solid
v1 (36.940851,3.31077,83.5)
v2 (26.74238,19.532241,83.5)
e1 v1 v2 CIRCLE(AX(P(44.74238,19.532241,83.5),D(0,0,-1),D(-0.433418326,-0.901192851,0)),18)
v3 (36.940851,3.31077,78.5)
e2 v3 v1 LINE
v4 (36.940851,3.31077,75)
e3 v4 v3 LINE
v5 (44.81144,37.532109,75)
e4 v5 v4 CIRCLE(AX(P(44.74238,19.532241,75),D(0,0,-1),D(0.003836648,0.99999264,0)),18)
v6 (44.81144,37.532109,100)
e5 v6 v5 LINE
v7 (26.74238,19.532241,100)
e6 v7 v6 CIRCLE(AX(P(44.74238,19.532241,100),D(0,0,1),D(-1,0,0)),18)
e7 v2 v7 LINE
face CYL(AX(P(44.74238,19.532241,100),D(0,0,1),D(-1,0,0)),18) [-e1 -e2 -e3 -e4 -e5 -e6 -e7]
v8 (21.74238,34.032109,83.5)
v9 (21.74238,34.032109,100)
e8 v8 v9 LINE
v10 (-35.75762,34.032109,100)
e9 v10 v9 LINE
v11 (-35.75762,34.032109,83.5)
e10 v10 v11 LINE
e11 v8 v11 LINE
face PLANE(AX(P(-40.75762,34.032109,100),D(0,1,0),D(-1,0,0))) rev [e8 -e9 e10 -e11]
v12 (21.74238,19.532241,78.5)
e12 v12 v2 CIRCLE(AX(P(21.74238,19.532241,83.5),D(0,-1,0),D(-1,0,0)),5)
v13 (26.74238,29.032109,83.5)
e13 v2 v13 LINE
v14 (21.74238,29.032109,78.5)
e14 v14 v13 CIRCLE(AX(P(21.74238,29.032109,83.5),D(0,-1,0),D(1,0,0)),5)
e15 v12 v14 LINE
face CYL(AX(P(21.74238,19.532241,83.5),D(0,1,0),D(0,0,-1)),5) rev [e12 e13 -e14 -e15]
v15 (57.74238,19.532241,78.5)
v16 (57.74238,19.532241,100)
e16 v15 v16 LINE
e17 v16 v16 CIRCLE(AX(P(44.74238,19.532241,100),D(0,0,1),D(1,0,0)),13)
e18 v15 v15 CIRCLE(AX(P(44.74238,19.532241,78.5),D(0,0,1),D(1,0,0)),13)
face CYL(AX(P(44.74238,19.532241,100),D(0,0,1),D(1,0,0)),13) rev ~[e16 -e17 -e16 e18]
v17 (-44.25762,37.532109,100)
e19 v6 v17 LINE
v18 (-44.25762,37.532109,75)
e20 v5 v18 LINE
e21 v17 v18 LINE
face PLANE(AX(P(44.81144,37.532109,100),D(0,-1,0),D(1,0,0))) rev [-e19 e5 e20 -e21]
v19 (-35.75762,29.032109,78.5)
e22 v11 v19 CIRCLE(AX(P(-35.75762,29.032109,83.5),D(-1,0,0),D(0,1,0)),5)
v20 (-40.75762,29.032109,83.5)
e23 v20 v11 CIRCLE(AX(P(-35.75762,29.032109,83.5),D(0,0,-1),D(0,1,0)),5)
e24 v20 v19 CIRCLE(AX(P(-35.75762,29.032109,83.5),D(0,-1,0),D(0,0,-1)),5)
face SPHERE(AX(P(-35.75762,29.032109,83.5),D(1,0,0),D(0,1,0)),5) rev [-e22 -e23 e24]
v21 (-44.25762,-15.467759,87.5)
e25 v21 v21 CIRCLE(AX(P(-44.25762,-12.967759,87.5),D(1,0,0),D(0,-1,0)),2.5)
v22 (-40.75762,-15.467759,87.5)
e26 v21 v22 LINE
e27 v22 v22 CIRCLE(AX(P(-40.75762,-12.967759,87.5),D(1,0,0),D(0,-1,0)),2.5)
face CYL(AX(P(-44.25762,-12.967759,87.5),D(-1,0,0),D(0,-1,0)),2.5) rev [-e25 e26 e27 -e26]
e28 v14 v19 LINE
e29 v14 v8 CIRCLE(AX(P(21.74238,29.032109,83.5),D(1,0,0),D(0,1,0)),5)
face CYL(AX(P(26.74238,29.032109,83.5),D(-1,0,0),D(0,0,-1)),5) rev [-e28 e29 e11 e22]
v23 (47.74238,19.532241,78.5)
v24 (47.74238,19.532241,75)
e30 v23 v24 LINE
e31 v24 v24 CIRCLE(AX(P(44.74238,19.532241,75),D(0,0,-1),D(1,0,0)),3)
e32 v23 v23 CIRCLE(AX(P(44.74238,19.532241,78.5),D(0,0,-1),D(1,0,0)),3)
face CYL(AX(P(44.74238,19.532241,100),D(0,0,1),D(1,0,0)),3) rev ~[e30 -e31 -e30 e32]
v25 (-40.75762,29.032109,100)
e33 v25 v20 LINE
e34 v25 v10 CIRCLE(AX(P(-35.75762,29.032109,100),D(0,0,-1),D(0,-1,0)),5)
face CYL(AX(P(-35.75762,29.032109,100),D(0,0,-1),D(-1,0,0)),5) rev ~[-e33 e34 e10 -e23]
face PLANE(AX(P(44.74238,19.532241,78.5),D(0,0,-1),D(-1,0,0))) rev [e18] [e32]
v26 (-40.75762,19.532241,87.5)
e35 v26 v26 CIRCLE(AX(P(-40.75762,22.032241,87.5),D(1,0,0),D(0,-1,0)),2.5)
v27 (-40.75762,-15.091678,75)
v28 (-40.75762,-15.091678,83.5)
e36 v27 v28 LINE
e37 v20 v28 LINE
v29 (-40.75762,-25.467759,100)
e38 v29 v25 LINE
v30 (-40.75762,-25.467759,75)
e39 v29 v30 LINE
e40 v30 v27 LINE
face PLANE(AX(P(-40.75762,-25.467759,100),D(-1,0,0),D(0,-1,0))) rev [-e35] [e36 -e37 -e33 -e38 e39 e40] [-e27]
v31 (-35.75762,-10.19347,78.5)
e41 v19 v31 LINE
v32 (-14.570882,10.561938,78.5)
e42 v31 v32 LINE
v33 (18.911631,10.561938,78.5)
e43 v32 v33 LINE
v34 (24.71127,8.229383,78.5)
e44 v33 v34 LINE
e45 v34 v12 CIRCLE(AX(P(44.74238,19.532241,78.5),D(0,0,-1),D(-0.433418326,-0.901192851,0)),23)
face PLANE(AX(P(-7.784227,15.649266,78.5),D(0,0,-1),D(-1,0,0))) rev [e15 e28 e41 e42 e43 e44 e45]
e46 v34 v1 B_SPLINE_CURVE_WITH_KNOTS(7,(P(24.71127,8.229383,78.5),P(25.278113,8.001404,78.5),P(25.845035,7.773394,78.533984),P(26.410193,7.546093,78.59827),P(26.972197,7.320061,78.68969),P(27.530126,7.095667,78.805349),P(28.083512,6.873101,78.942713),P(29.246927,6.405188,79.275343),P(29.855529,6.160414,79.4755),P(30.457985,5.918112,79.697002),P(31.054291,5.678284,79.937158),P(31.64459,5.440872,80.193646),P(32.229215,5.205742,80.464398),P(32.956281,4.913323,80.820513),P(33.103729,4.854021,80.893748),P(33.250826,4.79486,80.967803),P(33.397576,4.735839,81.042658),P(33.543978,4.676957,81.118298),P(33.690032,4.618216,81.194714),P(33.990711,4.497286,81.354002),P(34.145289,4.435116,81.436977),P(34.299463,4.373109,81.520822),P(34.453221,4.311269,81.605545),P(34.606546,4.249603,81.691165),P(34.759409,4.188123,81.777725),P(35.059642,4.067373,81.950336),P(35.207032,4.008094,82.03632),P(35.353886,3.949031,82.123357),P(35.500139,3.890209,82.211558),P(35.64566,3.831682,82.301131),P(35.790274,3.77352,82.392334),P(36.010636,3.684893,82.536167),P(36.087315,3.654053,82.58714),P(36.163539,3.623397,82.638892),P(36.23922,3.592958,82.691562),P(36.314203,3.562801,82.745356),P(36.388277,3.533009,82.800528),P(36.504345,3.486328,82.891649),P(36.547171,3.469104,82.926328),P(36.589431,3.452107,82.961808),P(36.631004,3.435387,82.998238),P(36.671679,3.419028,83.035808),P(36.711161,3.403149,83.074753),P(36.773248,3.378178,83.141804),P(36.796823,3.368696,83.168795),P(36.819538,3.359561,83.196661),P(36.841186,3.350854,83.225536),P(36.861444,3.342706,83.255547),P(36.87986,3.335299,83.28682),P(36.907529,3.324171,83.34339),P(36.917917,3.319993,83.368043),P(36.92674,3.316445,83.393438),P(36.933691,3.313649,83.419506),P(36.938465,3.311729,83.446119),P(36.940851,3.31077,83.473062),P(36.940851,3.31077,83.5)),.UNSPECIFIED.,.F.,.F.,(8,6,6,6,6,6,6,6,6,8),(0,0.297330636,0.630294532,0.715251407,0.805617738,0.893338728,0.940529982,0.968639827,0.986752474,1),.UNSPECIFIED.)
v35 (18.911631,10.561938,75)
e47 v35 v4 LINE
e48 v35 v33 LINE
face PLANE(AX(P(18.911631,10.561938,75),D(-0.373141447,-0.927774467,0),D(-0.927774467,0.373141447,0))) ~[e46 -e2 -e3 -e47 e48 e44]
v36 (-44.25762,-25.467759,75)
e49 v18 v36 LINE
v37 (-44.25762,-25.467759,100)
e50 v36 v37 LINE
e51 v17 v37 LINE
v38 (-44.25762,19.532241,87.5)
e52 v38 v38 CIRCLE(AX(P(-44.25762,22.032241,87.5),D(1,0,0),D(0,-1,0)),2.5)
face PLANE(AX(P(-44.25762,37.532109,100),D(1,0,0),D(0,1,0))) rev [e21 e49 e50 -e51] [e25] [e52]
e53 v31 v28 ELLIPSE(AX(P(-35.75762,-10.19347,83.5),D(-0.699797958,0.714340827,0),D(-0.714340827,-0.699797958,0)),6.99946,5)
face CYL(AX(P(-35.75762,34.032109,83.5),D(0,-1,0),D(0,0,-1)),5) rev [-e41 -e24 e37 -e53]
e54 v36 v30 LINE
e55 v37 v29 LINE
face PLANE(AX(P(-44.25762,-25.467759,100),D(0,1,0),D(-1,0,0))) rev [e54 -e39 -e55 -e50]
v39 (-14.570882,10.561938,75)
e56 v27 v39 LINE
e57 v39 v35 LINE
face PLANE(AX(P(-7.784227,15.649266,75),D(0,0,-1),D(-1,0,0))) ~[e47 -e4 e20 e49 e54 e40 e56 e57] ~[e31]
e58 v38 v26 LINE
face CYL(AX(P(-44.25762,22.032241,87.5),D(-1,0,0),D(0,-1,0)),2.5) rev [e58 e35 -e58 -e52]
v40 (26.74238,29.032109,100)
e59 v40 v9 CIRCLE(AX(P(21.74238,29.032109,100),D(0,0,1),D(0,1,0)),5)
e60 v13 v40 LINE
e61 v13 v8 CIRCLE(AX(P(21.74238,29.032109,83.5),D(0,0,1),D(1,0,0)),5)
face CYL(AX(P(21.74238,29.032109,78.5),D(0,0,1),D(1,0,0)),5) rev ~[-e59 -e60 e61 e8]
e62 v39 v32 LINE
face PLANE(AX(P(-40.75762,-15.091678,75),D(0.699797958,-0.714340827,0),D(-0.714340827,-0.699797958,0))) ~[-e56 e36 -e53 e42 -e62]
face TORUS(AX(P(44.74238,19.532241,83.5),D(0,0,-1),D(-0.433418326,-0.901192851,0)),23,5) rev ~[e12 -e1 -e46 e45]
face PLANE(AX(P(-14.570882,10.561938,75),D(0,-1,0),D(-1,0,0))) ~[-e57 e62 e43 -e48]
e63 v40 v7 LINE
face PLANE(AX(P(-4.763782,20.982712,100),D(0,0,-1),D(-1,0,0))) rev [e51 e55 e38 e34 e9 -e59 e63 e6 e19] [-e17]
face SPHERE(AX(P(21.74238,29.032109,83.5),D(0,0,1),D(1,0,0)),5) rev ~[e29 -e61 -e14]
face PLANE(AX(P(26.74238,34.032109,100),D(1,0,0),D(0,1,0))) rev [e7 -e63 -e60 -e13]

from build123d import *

# Parameters (mm, degrees)
F0_R      = 13
F1_DEPTH  = 25
F2_R      = 13
F3_DEPTH  = 3
F4_R      = 2.5
F5_DEPTH  = 25
F0_R_2    = 3
F6_DEPTH  = 30
F8_DEPTH  = 25
F9_DEPTH  = 3.5
F10_DEPTH = 30
F11_R     = 5


# Not quite as in the source:
# - a feature names something its author has since deleted; it is built from what else it names


with BuildPart() as f1:
    # F0 (on Top) → F1 (new body)
    with BuildSketch(Plane.XY):
        with BuildLine():
            Line((-44.2576195002, 24.5322410017), (-44.2576195002, -25.4677589983))
            Line((-44.2576195002, -25.4677589983), (-40.7576195002, -25.4677589983))
            Line((-40.7576195002, -25.4677589983), (-40.7576195002, 34.0321085225))
            Line((-40.7576195002, 34.0321085225), (26.7423804998, 34.0321085225))
            Line((26.7423804998, 34.0321085225), (26.7423804998, 19.5322410017))
            ThreePointArc((26.7423804998, 19.5322410017), (57.445862821, 6.7799260387), (44.8114401571, 37.5321085225))
            Line((44.8114401571, 37.5321085225), (44.6733208426, 37.5321085225))
            Line((44.6733208426, 37.5321085225), (-44.2576195002, 37.5321085225))
            Line((-44.2576195002, 37.5321085225), (-44.2576195002, 24.5322410017))
        make_face()
        with Locations((44.7423804998, 19.5322410017)):
            Circle(F0_R, mode=Mode.SUBTRACT)
    extrude(amount=F1_DEPTH)

    # F2 (on face) → F3 (join)
    with BuildSketch(Plane.XY.offset(25)):
        with BuildLine():
            ThreePointArc((26.7423804998, 19.5322410017), (29.5038185973, 9.9517279079), (36.9408506267, 3.3107696863))
            ThreePointArc((36.9408506267, 3.3107696863), (62.2844095115, 15.4977375434), (44.8114401571, 37.5321085225))
            Line((44.8114401571, 37.5321085225), (-44.2576195002, 37.5321085225))
            Line((-44.2576195002, 37.5321085225), (-44.2576195002, -25.4677589983))
            Line((-44.2576195002, -25.4677589983), (-40.7576195002, -25.4677589983))
            Line((-40.7576195002, -25.4677589983), (-40.7576195002, -15.0916781276))
            Line((-40.7576195002, -15.0916781276), (-40.7576195002, 34.0321085225))
            Line((-40.7576195002, 34.0321085225), (26.7423804998, 34.0321085225))
            Line((26.7423804998, 34.0321085225), (26.7423804998, 19.5322410017))
        make_face()
        with Locations((44.7423804998, 19.5322410017)):
            Circle(F2_R, mode=Mode.SUBTRACT)
    extrude(amount=-F3_DEPTH)

    # F4 (on face) → F5 (cut)
    with BuildSketch(Plane(origin=(-44.2576195002, 0, 0), x_dir=(0, -1, 0), z_dir=(-1, 0, 0))):
        with Locations((12.9677589983, 12.5)):
            Circle(F4_R)
    extrude(amount=-F5_DEPTH, mode=Mode.SUBTRACT)

    # F0 (on Top) → F6 (cut)
    with BuildSketch(Plane.XY):
        with Locations((44.7423804998, 19.5322410017)):
            Circle(F0_R_2)
    extrude(amount=F6_DEPTH, mode=Mode.SUBTRACT)

    # F4 (on face) → F8 (cut)
    with BuildSketch(Plane(origin=(-44.2576195002, 0, 0), x_dir=(0, -1, 0), z_dir=(-1, 0, 0))):
        with Locations((-22.0322410017, 12.5)):
            Circle(F4_R)
    extrude(amount=-F8_DEPTH, mode=Mode.SUBTRACT)

    # F2 (on face) → F9 (join)
    with BuildSketch(Plane.XY.offset(25)):
        with BuildLine():
            Line((18.9116307646, 10.5619383976), (36.9408506267, 3.3107696863))
            ThreePointArc((36.9408506267, 3.3107696863), (29.5038185973, 9.9517279079), (26.7423804998, 19.5322410017))
            Line((26.7423804998, 19.5322410017), (26.7423804998, 34.0321085225))
            Line((26.7423804998, 34.0321085225), (-40.7576195002, 34.0321085225))
            Line((-40.7576195002, 34.0321085225), (-40.7576195002, -15.0916781276))
            Line((-40.7576195002, -15.0916781276), (-14.5708816946, 10.5619383976))
            Line((-14.5708816946, 10.5619383976), (18.9116307646, 10.5619383976))
        make_face()
        with Locations((44.7423804998, 19.5322410017)):
            Circle(F2_R)
    extrude(amount=-F9_DEPTH)

    # F0 (on Top) → F10 (cut)
    with BuildSketch(Plane.XY):
        with Locations((44.7423804998, 19.5322410017)):
            Circle(F0_R_2)
    extrude(amount=F10_DEPTH, mode=Mode.SUBTRACT)

    # F11
    f11_edges = [f1.edges().sort_by_distance(p)[0] for p in [
        (26.74238, 34.032109, 10.75),
        (26.74238, 26.782175, 21.5),
        (-7.00762, 34.032109, 21.5),
        (-40.75762, 34.032109, 10.75),
        (-40.75762, 9.470215, 21.5),
    ]]
    fillet(f11_edges, radius=F11_R)


with BuildPart() as f13_1:
    # F13: instance of F1
    add(f1.part.mirror(Plane.XY.offset(50)))


solid = f13_1.part
